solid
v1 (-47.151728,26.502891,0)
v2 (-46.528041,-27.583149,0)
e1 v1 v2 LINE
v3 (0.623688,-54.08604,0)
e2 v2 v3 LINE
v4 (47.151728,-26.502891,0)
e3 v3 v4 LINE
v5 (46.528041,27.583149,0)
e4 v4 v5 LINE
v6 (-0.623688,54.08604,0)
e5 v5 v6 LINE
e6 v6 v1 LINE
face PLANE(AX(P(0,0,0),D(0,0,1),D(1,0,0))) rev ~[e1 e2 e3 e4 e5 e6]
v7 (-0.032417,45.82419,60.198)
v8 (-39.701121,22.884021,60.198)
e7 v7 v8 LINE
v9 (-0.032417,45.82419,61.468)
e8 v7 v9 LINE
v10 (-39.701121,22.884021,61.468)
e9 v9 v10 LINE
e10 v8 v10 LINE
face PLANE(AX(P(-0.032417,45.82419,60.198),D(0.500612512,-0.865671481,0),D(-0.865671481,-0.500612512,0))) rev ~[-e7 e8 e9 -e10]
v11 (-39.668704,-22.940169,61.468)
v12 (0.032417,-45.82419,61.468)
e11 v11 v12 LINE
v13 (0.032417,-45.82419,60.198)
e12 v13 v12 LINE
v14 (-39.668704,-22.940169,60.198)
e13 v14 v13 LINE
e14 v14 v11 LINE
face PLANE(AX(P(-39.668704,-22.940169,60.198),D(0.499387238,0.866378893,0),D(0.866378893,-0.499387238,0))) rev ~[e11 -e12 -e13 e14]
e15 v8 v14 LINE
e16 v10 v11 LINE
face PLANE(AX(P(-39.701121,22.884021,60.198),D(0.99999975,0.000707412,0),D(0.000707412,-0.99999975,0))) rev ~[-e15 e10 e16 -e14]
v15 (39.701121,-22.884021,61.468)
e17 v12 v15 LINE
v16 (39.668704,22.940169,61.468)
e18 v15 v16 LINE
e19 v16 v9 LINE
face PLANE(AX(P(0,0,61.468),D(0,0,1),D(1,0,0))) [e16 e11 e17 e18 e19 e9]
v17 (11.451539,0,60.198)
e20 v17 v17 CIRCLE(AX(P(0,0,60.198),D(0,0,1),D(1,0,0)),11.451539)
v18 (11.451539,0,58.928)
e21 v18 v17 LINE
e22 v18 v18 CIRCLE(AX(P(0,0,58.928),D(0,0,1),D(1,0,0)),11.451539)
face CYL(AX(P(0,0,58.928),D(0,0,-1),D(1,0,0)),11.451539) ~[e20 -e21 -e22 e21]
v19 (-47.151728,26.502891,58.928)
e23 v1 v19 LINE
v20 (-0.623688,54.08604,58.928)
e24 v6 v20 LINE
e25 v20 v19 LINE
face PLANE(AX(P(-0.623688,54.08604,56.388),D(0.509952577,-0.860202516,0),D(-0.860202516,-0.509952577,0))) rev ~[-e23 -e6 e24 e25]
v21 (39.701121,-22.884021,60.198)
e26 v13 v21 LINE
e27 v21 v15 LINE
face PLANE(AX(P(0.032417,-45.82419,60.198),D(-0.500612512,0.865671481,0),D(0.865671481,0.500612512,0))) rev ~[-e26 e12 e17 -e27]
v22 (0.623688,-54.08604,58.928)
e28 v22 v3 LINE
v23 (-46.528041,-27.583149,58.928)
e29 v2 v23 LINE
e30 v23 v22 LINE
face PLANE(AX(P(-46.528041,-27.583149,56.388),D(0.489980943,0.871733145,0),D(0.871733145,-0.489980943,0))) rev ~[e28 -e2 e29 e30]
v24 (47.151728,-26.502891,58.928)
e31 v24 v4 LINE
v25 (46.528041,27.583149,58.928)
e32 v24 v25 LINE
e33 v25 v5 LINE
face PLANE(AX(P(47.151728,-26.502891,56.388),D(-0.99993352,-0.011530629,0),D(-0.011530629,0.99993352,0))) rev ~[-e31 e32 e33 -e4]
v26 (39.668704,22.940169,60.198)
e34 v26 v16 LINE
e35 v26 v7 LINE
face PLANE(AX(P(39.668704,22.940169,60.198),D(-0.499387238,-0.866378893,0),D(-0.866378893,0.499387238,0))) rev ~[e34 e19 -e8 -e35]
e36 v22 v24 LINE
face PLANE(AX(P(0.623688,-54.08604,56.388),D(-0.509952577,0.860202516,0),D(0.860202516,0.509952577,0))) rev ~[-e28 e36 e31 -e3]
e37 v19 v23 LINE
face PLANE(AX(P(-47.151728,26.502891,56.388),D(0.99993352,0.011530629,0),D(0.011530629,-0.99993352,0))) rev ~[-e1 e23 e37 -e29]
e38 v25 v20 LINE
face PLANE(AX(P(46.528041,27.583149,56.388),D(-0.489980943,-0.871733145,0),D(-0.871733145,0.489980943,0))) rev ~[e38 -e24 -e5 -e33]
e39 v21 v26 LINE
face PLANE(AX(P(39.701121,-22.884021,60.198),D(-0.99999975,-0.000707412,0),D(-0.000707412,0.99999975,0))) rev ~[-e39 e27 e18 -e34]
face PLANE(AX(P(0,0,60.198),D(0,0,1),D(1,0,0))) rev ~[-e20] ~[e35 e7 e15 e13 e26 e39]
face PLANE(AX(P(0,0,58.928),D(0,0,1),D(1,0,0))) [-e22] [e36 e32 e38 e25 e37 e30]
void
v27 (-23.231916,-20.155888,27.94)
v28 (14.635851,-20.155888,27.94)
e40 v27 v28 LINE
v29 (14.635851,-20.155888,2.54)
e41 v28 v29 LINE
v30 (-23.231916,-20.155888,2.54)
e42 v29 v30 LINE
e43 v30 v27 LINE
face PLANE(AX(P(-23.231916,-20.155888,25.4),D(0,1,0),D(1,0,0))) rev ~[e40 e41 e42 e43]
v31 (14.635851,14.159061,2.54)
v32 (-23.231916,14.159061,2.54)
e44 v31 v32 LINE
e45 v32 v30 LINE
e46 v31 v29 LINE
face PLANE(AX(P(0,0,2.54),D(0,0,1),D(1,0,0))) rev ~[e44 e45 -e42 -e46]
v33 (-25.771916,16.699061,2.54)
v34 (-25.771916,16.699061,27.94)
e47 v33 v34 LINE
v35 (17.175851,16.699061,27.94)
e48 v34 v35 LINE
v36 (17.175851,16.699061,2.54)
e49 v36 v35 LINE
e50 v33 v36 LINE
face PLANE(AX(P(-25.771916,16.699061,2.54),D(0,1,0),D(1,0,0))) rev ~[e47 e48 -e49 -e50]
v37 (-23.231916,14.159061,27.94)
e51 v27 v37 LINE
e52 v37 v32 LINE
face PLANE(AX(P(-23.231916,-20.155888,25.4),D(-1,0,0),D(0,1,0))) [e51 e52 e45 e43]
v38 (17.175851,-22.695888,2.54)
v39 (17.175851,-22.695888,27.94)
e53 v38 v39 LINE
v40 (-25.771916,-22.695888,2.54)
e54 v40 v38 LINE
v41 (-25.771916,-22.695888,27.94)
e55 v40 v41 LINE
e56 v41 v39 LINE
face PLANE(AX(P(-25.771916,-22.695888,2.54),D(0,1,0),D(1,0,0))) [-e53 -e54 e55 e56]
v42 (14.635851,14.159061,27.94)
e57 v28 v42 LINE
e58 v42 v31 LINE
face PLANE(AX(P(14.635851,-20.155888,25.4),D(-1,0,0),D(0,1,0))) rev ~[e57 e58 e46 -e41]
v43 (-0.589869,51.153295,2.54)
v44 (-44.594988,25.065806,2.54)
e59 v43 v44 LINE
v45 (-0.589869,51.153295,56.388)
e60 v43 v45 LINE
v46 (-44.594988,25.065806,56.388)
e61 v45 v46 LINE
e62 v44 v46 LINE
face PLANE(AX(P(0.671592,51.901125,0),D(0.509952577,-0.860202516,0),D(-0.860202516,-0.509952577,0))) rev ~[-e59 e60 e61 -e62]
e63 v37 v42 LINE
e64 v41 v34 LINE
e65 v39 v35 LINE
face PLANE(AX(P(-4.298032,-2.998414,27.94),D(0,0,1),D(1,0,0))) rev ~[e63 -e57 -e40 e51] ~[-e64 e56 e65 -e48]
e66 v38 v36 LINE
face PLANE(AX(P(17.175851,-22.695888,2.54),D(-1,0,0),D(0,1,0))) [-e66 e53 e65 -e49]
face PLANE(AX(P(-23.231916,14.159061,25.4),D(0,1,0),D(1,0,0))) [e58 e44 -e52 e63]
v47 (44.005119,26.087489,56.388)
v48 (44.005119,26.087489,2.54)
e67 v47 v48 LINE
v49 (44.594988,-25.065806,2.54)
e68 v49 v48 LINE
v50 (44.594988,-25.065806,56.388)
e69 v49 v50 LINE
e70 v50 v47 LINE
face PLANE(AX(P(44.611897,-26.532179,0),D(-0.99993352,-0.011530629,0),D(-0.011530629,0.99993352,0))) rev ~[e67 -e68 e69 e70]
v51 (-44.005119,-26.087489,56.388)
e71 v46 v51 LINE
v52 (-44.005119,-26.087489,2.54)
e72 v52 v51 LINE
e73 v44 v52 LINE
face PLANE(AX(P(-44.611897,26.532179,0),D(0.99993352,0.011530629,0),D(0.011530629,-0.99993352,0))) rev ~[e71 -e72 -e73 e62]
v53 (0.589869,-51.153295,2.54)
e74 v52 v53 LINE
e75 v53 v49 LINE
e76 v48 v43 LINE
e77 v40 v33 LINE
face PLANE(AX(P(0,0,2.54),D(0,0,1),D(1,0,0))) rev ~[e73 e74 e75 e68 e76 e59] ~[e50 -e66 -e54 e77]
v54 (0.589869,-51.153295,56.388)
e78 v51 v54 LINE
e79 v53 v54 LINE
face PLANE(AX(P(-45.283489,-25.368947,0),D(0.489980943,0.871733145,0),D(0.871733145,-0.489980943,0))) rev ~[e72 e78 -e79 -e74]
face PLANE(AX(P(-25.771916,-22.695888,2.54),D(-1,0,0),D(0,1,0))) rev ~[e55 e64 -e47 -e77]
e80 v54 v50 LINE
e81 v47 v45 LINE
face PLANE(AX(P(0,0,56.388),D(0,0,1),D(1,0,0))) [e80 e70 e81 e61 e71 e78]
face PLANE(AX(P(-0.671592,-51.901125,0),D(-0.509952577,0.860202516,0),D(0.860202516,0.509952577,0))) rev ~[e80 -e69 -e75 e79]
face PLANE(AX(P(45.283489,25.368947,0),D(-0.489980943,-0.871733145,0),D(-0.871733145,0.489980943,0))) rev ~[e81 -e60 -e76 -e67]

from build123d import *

# Parameters (mm, degrees)
F1_DEPTH  = 56.388
F2_T      = -2.54
F3_W      = 42.9477673024
F3_H      = 39.3949486315
F4_DEPTH  = 25.4
F5_T      = -2.54
F7_DEPTH  = 2.54
F8_R      = 11.4515388828
F9_DEPTH  = 1.27
F11_DEPTH = 1.27


# Not quite as in the source:
# - a shell that OpenCascade refuses in one call is made with other operations: the cavity is built on its own and cut out


with BuildPart() as f1:
    # F0 (on Top) → F1 (new body)
    with BuildSketch(Plane.XY):
        Polygon((46.5280407677, 27.5831491618), (-0.6236875067, 54.0860398741), (-47.1517282744, 26.5028907122), (-46.5280407677, -27.5831491618), (0.6236875067, -54.0860398741), (47.1517282744, -26.5028907122), align=None)
    extrude(amount=F1_DEPTH)

    # F2
    f2_openings = [f1.faces().sort_by_distance(p)[0] for p in [
        (0, 0, 56.388),
    ]]
    offset(amount=F2_T, openings=f2_openings)

    # F3 (on face) → F4 (join)
    with BuildSketch(Plane.XY.offset(2.54)):
        with Locations((-4.2980322614, -2.9984135181)):
            Rectangle(F3_W, F3_H)
    extrude(amount=F4_DEPTH)

    # F5: a shell. OpenCascade refuses it in one call, so the cavity is built on its own and cut out:
    # the body offset inwards by the wall thickness, plus a prism from it out through each open face.
    f5_core = offset(f1.part, amount=F5_T, kind=Kind.INTERSECTION, mode=Mode.PRIVATE)
    f5_exits = [f5_core.faces().sort_by_distance(p)[0] for p in [
        (-4.298032, -2.998414, 25.4),
    ]]
    add(f5_core, mode=Mode.SUBTRACT)
    extrude(f5_exits, amount=-F5_T, mode=Mode.SUBTRACT)

    # F6 (on face) → F7 (join)
    with BuildSketch(Plane.XY.offset(56.388)):
        Polygon((46.5280407677, 27.5831491618), (-0.6236875067, 54.0860398741), (-47.1517282744, 26.5028907122), (-46.5280407677, -27.5831491618), (0.6236875067, -54.0860398741), (47.1517282744, -26.5028907122), align=None)
    extrude(amount=F7_DEPTH)

    # F8 (on face) → F9 (join)
    with BuildSketch(Plane.XY.offset(58.928)):
        Circle(F8_R)
    extrude(amount=F9_DEPTH)

    # F10 (on face) → F11 (join)
    with BuildSketch(Plane.XY.offset(60.198)):
        Polygon((39.6687044392, 22.9401686529), (-0.0324166009, 45.824190106), (-39.7011210401, 22.8840214531), (-39.6687044392, -22.9401686529), (0.0324166009, -45.824190106), (39.7011210401, -22.8840214531), align=None)
    extrude(amount=F11_DEPTH)


solid = f1.part
